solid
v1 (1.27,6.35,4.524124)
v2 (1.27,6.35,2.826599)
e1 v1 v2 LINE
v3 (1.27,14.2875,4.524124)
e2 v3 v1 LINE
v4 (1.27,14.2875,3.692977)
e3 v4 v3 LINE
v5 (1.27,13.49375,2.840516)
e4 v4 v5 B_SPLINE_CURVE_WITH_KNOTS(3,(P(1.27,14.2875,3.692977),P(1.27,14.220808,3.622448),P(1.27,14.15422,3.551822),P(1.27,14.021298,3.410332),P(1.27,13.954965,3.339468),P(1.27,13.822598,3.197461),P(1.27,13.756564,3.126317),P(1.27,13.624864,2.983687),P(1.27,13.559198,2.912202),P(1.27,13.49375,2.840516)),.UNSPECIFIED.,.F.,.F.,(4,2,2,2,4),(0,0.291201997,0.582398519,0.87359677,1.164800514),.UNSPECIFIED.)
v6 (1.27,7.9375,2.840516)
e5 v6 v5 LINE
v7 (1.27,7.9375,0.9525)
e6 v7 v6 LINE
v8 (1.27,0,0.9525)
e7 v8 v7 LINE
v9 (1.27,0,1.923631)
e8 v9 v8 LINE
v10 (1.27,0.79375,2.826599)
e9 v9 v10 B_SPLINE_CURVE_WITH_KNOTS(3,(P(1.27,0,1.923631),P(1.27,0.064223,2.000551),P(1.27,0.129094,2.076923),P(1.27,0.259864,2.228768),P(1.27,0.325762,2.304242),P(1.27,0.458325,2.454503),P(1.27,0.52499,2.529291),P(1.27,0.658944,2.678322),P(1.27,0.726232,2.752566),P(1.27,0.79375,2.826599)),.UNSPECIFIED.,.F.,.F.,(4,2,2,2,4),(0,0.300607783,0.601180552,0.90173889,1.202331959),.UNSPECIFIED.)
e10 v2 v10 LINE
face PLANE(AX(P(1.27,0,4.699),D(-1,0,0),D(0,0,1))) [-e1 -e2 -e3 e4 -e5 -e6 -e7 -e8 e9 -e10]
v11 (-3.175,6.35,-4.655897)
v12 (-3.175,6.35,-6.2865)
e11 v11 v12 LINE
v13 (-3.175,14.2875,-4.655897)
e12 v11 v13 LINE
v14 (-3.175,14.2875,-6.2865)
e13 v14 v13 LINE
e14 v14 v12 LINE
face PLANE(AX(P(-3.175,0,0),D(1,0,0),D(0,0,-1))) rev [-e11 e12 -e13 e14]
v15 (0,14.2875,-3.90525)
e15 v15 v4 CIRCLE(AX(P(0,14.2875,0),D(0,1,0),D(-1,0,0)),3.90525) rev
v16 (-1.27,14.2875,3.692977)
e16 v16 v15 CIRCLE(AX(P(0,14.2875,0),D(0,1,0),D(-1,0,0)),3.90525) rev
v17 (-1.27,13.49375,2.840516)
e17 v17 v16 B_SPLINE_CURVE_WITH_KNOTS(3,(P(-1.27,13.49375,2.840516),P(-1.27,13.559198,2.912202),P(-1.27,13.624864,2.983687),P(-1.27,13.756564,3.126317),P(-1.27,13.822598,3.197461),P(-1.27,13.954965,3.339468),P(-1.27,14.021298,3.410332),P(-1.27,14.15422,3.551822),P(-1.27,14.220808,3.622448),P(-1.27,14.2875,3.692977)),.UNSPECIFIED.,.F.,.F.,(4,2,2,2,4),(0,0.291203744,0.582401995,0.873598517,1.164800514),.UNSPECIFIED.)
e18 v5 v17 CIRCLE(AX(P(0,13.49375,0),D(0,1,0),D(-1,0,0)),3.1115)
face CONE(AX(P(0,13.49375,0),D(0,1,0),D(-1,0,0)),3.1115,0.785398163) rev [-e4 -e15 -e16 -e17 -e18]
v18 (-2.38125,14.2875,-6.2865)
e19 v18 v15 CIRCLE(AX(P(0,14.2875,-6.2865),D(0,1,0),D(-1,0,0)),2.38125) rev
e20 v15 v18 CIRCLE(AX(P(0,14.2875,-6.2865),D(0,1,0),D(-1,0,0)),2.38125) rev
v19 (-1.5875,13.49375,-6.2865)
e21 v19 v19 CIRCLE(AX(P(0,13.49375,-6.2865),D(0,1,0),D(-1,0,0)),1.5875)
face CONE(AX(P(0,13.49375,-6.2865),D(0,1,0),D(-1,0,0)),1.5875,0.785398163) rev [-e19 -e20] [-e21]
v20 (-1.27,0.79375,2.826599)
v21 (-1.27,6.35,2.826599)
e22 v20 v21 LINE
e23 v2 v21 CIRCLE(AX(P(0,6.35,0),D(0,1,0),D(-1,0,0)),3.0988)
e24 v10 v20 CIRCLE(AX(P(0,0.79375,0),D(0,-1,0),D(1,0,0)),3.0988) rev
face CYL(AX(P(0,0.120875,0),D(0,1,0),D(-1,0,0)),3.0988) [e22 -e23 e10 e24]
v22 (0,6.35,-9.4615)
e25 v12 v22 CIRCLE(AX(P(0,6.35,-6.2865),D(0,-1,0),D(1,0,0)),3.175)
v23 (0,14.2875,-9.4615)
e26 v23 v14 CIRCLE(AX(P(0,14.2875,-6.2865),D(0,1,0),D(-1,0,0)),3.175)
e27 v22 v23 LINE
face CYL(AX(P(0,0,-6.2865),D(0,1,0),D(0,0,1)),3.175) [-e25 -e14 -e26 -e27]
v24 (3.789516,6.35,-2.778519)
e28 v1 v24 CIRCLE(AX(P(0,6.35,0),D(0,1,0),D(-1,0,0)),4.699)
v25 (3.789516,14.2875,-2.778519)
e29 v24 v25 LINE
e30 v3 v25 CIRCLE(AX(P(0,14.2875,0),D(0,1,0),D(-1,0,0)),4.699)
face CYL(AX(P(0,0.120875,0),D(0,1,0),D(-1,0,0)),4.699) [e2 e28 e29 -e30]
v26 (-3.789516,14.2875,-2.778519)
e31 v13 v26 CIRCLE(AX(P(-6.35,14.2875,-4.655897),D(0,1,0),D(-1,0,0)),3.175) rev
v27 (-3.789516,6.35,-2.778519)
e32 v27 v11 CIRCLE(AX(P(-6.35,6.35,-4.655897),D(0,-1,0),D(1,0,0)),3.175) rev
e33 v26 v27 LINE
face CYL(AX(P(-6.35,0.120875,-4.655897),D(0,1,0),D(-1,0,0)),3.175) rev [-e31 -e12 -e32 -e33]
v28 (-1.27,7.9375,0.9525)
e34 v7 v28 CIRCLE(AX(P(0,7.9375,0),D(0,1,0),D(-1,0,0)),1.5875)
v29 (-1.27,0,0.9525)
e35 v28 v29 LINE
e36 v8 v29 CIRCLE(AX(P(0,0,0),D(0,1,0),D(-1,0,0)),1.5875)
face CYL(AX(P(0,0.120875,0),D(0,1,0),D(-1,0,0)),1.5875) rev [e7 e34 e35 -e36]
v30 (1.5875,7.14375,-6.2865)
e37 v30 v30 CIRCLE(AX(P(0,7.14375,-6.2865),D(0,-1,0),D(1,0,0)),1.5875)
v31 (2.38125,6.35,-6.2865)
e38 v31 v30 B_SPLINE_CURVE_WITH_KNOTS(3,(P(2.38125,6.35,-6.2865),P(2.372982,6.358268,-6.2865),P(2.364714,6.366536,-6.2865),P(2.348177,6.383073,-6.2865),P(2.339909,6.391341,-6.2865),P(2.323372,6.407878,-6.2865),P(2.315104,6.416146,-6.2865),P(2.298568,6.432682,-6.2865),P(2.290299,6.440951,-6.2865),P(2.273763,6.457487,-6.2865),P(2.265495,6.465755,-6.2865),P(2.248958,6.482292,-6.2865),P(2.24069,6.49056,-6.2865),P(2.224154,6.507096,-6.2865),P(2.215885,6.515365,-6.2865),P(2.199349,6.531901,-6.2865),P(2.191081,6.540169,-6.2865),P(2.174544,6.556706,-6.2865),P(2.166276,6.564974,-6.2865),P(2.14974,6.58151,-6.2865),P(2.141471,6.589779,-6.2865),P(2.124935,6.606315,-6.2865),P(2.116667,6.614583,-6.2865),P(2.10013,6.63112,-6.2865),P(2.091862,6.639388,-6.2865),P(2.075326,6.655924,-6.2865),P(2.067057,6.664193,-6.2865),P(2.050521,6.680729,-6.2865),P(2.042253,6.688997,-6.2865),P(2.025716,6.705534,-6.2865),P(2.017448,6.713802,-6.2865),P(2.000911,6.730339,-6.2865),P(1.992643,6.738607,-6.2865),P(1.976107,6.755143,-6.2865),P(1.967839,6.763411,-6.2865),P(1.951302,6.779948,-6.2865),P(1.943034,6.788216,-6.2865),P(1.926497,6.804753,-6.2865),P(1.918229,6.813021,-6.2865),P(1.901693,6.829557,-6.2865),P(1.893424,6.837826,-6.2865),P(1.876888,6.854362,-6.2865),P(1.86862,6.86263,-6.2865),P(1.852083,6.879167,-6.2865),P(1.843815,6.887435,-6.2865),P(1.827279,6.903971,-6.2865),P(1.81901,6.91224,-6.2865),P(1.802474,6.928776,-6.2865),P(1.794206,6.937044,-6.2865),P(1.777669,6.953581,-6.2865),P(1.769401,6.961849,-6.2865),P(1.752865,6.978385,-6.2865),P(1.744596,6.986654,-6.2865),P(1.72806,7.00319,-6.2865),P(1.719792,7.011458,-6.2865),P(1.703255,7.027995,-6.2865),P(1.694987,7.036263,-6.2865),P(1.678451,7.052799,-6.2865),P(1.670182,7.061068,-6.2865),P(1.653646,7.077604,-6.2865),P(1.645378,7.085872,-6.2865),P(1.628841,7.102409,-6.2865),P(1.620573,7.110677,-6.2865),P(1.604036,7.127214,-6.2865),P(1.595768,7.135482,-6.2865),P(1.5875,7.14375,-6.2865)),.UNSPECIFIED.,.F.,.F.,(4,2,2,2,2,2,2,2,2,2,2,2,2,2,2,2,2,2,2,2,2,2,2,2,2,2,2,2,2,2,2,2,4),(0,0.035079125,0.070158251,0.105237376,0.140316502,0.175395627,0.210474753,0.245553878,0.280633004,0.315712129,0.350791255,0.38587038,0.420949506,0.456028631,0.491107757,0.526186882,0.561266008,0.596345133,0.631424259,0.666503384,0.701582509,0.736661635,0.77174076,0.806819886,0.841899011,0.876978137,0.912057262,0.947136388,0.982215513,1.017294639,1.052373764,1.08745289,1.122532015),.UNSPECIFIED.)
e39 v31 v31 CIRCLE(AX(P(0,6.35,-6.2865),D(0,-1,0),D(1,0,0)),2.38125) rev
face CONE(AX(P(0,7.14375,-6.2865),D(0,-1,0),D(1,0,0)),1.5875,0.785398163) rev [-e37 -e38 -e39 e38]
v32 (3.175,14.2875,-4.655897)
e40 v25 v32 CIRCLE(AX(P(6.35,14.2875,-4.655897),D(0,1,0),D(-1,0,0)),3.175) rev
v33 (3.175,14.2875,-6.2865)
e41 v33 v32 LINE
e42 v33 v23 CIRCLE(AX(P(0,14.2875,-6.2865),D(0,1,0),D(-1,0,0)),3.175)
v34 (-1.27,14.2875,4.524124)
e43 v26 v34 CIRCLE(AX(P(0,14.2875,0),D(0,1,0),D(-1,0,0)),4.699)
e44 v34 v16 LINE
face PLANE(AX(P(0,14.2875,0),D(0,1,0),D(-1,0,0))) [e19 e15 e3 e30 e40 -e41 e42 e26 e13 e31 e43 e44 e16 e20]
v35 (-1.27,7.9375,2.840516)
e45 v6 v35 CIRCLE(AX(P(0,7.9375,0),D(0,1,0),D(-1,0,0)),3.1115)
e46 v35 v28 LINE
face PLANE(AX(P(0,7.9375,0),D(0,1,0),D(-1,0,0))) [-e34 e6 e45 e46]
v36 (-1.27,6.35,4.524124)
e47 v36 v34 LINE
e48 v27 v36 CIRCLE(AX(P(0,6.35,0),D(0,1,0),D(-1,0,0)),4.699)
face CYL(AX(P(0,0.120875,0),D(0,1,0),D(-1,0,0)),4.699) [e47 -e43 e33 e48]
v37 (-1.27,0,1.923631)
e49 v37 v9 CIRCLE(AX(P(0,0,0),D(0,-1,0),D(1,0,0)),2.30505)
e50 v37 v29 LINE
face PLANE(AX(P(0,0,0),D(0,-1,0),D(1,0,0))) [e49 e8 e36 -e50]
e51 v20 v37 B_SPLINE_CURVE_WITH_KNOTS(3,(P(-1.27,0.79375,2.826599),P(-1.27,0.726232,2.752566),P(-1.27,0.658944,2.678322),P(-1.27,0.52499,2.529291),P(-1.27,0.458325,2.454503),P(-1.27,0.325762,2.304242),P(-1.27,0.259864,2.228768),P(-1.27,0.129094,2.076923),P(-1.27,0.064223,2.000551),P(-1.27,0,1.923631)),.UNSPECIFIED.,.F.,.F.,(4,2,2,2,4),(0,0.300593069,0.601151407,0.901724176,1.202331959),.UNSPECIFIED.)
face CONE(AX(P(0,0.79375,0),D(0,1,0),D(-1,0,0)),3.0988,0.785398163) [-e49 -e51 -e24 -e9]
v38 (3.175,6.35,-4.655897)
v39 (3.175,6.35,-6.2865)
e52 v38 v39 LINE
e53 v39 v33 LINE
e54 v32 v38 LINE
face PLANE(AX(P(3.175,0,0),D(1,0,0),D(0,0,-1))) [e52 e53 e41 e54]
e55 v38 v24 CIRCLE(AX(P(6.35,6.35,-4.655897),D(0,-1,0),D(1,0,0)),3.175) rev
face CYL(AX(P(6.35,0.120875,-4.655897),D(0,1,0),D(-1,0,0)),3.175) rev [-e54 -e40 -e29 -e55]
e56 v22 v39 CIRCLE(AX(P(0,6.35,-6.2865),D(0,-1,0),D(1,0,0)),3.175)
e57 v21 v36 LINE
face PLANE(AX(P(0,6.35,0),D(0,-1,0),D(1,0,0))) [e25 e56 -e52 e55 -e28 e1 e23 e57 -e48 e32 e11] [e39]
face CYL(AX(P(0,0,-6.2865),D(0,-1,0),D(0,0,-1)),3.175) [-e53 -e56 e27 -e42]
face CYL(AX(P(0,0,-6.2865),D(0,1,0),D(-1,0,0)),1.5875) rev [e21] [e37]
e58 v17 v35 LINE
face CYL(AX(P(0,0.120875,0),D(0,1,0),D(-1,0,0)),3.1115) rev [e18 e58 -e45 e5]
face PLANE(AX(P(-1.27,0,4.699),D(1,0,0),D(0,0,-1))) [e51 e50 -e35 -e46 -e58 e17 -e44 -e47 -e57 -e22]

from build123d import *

# Parameters (mm, degrees)
SKETCH2_W           = 2.54
SKETCH2_H           = 14.2875
CUT_EXTRUDE1_DEPTH  = 16.757342995
SKETCH3_W           = 1.5875
SKETCH3_H           = 7.9375
SKETCH3_W_2         = 4.7625
SKETCH3_H_2         = 4.7625
BOSS_EXTRUDE2_DEPTH = 3.175
SKETCH4_R           = 1.5875
CUT_EXTRUDE2_DEPTH  = 18.768884025
CHAMFER2_SIZE       = 0.79375
FILLET3_R           = 3.175


with BuildPart() as part:
    # Sketch1 → Revolve1 (revolve)
    with BuildSketch(Plane.XY, mode=Mode.PRIVATE) as revolve1_sk:
        Polygon((1.5875, 7.9375), (1.5875, 0), (3.0988, 0), (3.0988, 6.35), (4.699, 6.35), (4.699, 14.2875), (3.1115, 14.2875), (3.1115, 7.9375), align=None)
    revolve(revolve1_sk.sketch.rotate(Axis((0, 0.120875177, 0), (0, -1, 0)), 180), axis=Axis((0, 0.120875177, 0), (0, -1, 0)))

    # Sketch2 → Cut-Extrude1 (cut, through all)
    with BuildSketch(Plane.XY):
        with Locations((0, 7.14375)):
            Rectangle(SKETCH2_W, SKETCH2_H)
    extrude(amount=CUT_EXTRUDE1_DEPTH, mode=Mode.SUBTRACT)

    # Sketch3 → Boss-Extrude2 (add, symmetric)
    # profile 1 of 3: a face of its own
    with BuildSketch(Plane(origin=(0, 0, 0), x_dir=(0, 0, -1), z_dir=(1, 0, 0))):
        with Locations((3.90525, 10.31875)):
            Rectangle(SKETCH3_W, SKETCH3_H)
    # profile 2 of 3: a face of its own
    with BuildSketch(Plane(origin=(0, 0, 0), x_dir=(0, 0, -1), z_dir=(1, 0, 0))):
        with Locations((7.08025, 10.31875)):
            Rectangle(SKETCH3_W_2, SKETCH3_H)
        with Locations((7.08025, 10.31875)):
            Rectangle(SKETCH3_W, SKETCH3_H_2, mode=Mode.SUBTRACT)
    # profile 3 of 3: a face of its own
    with BuildSketch(Plane(origin=(0, 0, 0), x_dir=(0, 0, -1), z_dir=(1, 0, 0))):
        with Locations((7.08025, 10.31875)):
            Rectangle(SKETCH3_W, SKETCH3_H_2)
    extrude(amount=BOSS_EXTRUDE2_DEPTH, both=True)

    # Sketch4 → Cut-Extrude2 (cut, through all)
    with BuildSketch(Plane(origin=(0, 14.2875, 0), x_dir=(1, 0, 0), z_dir=(0, 1, 0))):
        with Locations(Location((0, 6.2865, 0), (0, 0, 180))):
            Circle(SKETCH4_R)
    extrude(amount=-CUT_EXTRUDE2_DEPTH, mode=Mode.SUBTRACT)

    # Chamfer2
    chamfer2_edges = [part.edges().sort_by_distance(p)[0] for p in [
        (0, 14.2875, -3.1115),
        (0, 0, -3.0988),
        (1.5875, 6.35, -6.2865),
        (1.5875, 14.2875, -6.2865),
    ]]
    chamfer(chamfer2_edges, length=CHAMFER2_SIZE - 0.0001)  # a hair under: the kernel refuses the full size

    # Fillet3
    fillet3_edges = [part.edges().sort_by_distance(p)[0] for p in [
        (3.175, 10.31875, -3.464098151),
        (-3.175, 10.31875, -3.464098151),
        (-3.175, 10.31875, -9.4615),
        (3.175, 10.31875, -9.4615),
    ]]
    fillet(fillet3_edges, radius=FILLET3_R - 0.0001)  # a hair under: the kernel refuses the full size


solid = part.part
